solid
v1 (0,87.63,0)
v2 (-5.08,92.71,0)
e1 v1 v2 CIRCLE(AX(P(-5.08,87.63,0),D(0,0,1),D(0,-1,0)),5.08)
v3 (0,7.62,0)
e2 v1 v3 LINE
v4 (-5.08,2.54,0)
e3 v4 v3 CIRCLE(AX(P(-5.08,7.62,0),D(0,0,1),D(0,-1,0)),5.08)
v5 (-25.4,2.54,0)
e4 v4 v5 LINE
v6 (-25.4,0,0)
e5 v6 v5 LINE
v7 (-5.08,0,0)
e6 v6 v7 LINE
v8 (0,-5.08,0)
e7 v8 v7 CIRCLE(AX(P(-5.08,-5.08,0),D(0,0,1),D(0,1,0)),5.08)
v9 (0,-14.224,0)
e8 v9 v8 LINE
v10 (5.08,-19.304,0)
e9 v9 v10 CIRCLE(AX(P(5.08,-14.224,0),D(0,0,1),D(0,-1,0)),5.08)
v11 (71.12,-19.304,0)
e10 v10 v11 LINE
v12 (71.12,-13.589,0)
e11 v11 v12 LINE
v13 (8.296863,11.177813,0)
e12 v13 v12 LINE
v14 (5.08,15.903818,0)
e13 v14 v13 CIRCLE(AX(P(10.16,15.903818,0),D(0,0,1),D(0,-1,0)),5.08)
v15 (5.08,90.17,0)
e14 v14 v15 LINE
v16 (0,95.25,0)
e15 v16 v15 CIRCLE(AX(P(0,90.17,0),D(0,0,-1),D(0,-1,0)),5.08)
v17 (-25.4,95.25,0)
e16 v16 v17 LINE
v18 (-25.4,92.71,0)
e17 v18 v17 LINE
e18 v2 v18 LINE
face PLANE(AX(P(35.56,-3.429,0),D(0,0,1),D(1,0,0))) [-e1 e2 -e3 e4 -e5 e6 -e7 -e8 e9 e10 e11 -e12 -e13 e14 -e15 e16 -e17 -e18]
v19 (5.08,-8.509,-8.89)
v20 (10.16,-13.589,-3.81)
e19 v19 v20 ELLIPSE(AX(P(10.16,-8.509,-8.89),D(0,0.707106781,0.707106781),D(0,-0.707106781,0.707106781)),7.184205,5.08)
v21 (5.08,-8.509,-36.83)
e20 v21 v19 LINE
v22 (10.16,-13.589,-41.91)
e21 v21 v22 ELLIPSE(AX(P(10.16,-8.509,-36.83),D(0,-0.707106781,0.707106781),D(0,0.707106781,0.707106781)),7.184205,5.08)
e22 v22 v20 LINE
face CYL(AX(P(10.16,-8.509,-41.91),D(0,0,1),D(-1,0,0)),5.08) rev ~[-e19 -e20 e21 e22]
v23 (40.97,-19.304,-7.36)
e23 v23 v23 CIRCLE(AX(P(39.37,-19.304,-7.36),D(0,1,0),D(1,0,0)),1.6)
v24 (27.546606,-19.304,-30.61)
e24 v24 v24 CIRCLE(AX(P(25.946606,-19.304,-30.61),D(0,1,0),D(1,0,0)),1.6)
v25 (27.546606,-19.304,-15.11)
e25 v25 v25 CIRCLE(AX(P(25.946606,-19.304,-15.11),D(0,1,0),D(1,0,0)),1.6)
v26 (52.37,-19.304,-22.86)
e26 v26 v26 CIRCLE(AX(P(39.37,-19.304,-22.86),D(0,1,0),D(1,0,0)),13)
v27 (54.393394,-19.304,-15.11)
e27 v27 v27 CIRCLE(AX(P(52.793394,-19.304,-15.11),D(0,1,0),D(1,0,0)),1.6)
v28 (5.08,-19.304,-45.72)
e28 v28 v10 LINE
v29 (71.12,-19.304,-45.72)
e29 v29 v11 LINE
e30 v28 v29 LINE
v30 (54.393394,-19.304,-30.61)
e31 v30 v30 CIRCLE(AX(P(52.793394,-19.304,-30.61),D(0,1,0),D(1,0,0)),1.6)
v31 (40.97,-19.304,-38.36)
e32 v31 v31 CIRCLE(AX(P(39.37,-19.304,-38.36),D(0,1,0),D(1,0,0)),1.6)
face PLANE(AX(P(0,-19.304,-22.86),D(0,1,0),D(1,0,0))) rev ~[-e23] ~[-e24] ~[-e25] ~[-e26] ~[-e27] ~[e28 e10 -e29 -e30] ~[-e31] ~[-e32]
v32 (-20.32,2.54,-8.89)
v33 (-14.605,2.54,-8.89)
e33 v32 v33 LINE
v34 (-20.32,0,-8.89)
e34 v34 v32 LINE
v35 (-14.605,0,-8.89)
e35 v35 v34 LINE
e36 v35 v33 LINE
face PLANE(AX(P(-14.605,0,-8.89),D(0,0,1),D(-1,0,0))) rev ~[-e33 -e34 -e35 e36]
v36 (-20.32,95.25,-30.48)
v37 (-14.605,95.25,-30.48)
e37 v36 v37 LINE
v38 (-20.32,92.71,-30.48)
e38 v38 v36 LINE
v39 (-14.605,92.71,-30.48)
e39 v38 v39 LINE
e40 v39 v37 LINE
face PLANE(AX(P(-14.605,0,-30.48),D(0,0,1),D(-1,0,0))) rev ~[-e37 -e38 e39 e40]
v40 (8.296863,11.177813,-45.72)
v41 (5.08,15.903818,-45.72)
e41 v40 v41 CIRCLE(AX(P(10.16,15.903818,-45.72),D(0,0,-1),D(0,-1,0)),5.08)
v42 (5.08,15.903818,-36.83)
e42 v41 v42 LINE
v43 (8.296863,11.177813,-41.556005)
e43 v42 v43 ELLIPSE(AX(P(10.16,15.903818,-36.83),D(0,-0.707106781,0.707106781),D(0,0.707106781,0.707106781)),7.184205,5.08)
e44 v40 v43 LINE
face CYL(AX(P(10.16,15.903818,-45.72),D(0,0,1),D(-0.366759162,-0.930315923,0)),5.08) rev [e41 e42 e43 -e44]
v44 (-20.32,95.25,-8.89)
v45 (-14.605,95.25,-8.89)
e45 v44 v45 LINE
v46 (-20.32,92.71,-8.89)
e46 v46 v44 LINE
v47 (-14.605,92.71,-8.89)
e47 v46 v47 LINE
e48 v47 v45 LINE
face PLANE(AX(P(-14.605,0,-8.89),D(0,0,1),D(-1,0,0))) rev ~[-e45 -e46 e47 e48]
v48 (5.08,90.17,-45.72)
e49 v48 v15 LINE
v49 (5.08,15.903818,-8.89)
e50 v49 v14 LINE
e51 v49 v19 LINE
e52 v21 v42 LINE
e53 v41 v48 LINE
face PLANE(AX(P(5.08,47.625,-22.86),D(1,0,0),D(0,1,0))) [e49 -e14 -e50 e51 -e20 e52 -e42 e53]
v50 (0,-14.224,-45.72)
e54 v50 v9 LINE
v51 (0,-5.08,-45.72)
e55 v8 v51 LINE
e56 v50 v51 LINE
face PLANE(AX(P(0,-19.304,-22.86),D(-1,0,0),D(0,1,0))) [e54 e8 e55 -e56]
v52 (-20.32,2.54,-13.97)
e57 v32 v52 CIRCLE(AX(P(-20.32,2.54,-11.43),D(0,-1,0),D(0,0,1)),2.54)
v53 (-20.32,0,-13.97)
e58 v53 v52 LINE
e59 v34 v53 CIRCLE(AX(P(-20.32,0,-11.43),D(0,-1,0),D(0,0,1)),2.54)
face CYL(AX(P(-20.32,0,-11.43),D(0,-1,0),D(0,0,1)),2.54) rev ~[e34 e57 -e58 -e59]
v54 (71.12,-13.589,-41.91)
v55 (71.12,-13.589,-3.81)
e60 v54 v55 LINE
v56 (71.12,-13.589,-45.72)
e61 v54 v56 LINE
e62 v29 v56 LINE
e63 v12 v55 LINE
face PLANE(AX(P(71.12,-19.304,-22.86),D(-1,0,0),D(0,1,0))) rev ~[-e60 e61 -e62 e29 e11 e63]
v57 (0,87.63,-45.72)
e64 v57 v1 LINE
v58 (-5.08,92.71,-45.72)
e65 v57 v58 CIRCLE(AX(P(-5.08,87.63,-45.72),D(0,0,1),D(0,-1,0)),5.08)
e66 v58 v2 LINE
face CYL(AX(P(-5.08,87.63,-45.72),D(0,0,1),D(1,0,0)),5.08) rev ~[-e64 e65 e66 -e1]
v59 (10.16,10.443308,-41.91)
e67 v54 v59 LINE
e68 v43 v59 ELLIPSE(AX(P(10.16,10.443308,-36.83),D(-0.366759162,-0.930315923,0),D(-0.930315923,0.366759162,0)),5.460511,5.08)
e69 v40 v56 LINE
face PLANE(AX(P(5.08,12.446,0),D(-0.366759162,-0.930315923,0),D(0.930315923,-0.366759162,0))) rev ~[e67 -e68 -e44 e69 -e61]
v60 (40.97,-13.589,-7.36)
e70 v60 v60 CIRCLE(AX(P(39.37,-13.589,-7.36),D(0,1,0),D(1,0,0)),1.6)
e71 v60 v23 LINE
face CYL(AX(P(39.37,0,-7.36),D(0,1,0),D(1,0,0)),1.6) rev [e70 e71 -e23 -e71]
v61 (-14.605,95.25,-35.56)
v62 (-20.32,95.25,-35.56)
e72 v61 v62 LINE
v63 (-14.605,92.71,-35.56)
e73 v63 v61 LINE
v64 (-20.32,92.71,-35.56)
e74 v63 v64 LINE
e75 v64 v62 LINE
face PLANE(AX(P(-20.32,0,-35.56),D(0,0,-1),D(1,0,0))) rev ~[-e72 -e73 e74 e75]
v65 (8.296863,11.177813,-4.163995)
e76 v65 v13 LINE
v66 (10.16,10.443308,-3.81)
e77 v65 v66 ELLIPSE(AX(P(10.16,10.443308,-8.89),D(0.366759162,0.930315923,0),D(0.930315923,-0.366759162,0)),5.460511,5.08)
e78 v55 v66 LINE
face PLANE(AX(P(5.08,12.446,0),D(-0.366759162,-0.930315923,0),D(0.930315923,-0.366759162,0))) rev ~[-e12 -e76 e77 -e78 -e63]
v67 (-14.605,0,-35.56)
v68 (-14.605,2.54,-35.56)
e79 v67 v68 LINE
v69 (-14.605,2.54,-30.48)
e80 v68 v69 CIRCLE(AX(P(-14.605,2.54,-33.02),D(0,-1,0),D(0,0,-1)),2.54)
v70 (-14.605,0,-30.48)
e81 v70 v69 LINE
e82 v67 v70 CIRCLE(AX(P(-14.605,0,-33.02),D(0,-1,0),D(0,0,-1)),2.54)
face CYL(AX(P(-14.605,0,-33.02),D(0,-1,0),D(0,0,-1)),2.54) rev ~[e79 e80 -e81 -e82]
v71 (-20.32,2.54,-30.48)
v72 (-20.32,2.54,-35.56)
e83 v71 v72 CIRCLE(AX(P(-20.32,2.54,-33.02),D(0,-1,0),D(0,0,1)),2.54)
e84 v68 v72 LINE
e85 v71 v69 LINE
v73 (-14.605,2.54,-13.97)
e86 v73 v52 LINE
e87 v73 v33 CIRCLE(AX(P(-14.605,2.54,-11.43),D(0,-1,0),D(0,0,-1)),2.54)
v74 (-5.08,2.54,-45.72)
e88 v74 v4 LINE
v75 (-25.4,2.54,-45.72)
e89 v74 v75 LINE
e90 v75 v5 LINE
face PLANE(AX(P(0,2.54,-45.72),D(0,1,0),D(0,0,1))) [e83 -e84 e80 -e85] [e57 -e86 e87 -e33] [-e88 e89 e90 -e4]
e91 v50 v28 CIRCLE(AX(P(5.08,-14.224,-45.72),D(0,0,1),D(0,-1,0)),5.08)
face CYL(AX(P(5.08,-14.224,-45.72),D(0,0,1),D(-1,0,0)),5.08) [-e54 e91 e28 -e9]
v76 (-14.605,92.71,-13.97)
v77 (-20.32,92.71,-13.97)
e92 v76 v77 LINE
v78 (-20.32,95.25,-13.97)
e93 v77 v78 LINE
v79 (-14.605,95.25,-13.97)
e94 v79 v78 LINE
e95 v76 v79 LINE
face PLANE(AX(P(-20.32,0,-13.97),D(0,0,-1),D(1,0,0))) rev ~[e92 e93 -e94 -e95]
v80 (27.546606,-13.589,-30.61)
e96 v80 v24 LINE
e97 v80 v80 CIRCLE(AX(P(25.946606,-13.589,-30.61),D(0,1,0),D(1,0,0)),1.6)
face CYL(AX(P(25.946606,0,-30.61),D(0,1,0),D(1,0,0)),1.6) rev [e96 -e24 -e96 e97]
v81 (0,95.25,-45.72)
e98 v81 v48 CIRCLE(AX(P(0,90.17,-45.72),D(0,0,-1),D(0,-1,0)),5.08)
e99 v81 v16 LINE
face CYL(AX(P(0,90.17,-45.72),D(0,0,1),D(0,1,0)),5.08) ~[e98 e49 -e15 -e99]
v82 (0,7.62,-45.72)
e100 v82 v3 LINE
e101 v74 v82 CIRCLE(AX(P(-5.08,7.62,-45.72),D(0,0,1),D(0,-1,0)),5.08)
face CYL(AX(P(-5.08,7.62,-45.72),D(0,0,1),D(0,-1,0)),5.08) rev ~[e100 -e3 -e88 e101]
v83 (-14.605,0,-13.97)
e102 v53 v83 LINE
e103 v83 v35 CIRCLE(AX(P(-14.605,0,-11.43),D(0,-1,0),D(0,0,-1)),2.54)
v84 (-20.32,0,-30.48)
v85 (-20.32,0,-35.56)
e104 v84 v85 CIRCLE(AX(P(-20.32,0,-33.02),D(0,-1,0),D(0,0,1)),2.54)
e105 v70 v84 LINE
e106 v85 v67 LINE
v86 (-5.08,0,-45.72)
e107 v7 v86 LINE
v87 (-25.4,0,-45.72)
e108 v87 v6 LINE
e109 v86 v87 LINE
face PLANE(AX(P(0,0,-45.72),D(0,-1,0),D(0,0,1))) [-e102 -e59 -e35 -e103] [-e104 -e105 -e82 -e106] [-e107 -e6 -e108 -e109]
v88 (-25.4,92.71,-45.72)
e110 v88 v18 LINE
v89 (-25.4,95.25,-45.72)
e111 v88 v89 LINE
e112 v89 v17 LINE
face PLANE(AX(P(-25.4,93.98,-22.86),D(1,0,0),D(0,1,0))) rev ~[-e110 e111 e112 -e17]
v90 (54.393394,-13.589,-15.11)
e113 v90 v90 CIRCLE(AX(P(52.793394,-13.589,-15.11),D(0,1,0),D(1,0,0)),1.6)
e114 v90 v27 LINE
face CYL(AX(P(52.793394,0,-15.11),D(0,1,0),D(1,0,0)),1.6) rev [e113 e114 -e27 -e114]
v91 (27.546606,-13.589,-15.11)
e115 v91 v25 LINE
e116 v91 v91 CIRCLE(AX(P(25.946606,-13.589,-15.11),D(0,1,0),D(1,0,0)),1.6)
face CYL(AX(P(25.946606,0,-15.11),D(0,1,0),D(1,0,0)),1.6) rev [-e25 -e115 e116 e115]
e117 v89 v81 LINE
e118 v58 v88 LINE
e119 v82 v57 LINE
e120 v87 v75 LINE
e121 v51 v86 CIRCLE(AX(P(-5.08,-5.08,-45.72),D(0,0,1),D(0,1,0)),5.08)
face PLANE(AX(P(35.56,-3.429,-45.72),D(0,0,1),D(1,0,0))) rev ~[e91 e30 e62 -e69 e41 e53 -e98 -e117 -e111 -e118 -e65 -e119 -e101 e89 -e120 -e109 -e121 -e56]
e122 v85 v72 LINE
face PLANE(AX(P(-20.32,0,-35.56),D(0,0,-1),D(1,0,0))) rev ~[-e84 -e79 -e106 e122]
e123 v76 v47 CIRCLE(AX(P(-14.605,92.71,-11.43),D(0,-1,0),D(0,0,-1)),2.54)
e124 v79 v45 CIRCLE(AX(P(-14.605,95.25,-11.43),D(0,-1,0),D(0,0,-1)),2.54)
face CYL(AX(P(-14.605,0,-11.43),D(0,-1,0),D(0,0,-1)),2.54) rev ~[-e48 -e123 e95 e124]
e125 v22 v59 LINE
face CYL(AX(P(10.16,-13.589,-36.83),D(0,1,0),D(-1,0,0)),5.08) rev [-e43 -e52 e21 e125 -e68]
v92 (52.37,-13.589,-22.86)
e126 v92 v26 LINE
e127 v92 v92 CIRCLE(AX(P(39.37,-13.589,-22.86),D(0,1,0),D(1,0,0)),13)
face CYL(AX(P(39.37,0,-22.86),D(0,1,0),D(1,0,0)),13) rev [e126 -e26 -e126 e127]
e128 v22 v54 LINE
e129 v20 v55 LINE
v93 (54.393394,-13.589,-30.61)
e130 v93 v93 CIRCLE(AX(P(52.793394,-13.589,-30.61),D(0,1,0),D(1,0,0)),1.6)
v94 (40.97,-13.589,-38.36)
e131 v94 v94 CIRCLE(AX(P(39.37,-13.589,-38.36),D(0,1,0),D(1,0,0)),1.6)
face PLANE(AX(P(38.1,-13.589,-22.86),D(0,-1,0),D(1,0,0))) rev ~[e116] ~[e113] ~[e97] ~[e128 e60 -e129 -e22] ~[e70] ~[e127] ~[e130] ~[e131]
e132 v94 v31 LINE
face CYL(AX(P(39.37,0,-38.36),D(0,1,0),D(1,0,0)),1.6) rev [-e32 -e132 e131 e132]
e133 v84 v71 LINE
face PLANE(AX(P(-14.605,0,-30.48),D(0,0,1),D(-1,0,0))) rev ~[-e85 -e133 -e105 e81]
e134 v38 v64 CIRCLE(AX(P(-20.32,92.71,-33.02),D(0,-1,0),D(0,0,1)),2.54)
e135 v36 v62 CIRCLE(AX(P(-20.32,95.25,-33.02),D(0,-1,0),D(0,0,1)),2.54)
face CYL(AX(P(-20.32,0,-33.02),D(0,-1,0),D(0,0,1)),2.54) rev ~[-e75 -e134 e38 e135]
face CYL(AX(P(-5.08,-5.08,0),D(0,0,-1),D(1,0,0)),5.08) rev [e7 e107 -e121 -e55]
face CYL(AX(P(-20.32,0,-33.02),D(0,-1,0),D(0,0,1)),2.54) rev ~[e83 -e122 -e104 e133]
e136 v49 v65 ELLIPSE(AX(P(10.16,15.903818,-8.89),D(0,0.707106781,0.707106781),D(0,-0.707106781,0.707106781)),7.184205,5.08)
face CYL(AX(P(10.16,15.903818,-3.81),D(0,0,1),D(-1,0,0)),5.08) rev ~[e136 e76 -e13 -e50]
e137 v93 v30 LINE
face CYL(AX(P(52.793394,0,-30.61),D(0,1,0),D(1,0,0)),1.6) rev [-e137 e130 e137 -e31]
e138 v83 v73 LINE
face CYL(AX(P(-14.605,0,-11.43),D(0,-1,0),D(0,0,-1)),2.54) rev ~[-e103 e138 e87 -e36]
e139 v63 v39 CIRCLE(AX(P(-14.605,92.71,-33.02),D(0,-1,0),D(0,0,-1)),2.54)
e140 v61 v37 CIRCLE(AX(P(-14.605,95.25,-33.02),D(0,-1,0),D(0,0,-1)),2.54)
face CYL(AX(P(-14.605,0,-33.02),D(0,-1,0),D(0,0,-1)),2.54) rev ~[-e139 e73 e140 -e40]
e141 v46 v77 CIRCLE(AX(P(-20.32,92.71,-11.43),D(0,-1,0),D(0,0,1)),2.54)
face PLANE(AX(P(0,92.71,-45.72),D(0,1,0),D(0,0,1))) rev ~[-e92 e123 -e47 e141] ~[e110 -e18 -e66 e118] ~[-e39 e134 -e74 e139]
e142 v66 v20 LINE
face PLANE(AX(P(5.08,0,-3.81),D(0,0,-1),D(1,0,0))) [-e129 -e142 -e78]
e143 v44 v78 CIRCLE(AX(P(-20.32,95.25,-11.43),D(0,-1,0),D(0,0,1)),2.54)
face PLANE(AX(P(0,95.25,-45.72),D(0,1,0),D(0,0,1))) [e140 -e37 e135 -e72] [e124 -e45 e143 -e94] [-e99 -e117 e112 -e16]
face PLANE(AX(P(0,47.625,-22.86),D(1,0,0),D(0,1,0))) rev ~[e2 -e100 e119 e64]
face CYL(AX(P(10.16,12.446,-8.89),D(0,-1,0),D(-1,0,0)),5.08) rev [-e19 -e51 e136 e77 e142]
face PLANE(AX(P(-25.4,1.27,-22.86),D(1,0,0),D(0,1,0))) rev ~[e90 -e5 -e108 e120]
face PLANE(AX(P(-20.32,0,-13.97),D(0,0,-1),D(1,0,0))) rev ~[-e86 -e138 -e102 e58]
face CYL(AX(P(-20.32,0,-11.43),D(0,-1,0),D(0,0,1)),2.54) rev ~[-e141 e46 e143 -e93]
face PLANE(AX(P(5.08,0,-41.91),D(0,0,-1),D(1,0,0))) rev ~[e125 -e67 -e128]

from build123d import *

# Parameters (mm, degrees)
F0_W           = 95.25
F0_H           = 45.72
F1_DEPTH       = 5.08
F2_W           = 2.54
F2_H           = 45.72
F3_DEPTH       = 25.4
F5_DEPTH       = 95.251
F5_DEPTH_BACK  = 163
F8_W           = 71.12
F8_H           = 31.75
F9_DEPTH       = 22.86
F9_DEPTH_BACK  = 22.86
F10_W          = 66.04
F10_H          = 38.1
F11_DEPTH      = 95.251
F11_DEPTH_BACK = 13.589
F13_DEPTH      = 45.721
F13_DEPTH_BACK = 190
F14_R          = 1.6
F14_R_2        = 13
F15_DEPTH      = 19.305
F16_R          = 5.08


# Not quite as in the source:
# - an extrude ends at something that could not be found from the text; its depth is read off the source's solid


with BuildPart() as f1:
    # F0 (on Right) → F1 (new body)
    with BuildSketch(Plane.YZ):
        with Locations((47.625, -22.86)):
            Rectangle(F0_W, F0_H)
    extrude(amount=F1_DEPTH)

    # F2 (on Right) → F3 (join)
    with BuildSketch(Plane.YZ):
        with Locations((93.98, -22.86)):
            Rectangle(F2_W, F2_H)
        with Locations((1.27, -22.86)):
            Rectangle(F2_W, F2_H)
    extrude(amount=-F3_DEPTH)

    # F4 (on Front) → F5 (cut, two sides)
    with BuildSketch(Plane.XZ) as f5_sk:
        with BuildLine():
            Line((-20.32, -13.97), (-14.605, -13.97))
            ThreePointArc((-14.605, -13.97), (-12.065, -11.43), (-14.605, -8.89))
            Line((-14.605, -8.89), (-20.32, -8.89))
            ThreePointArc((-20.32, -8.89), (-22.86, -11.43), (-20.32, -13.97))
        make_face()
        with BuildLine():
            Line((-20.32, -35.56), (-14.605, -35.56))
            ThreePointArc((-14.605, -35.56), (-12.065, -33.02), (-14.605, -30.48))
            Line((-14.605, -30.48), (-20.32, -30.48))
            ThreePointArc((-20.32, -30.48), (-22.86, -33.02), (-20.32, -35.56))
        make_face()
    extrude(amount=-F5_DEPTH, mode=Mode.SUBTRACT)
    extrude(f5_sk.sketch, amount=F5_DEPTH_BACK, mode=Mode.SUBTRACT)

    # F8 (on plane+point) → F9 (join, two sides)
    with BuildSketch(Plane.XY.offset(-22.86)) as f9_sk:
        with Locations((35.56, -3.429)):
            Rectangle(F8_W, F8_H)
    extrude(amount=-F9_DEPTH)
    extrude(f9_sk.sketch, amount=F9_DEPTH_BACK)

    # F10 (on Front) → F11 (cut, two sides)
    with BuildSketch(Plane.XZ) as f11_sk:
        with Locations((38.1, -22.86)):
            Rectangle(F10_W, F10_H)
    extrude(amount=-F11_DEPTH, mode=Mode.SUBTRACT)
    extrude(f11_sk.sketch, amount=F11_DEPTH_BACK, mode=Mode.SUBTRACT)

    # F12 (on Top) → F13 (cut, two sides)
    with BuildSketch(Plane.XY) as f13_sk:
        Polygon((5.08, 12.446), (71.12, -13.589), (71.12, 12.446), align=None)
    extrude(amount=-F13_DEPTH, mode=Mode.SUBTRACT)
    extrude(f13_sk.sketch, amount=F13_DEPTH_BACK, mode=Mode.SUBTRACT)

    # F14 (on Front) → F15 (cut, through all)
    with BuildSketch(Plane.XZ):
        with Locations((39.37, -7.36)):
            Circle(F14_R)
        with Locations((25.9466062413, -15.11)):
            Circle(F14_R)
        with Locations((25.9466062413, -30.61)):
            Circle(F14_R)
        with Locations((39.37, -38.36)):
            Circle(F14_R)
        with Locations((52.7933937587, -30.61)):
            Circle(F14_R)
        with Locations((52.7933937587, -15.11)):
            Circle(F14_R)
        with Locations((39.37, -22.86)):
            Circle(F14_R_2)
    extrude(amount=F15_DEPTH, mode=Mode.SUBTRACT)

    # F16
    f16_edges = [f1.edges().sort_by_distance(p)[0] for p in [
        (0, 92.71, -22.86),
        (0, 2.54, -22.86),
        (0, 0, -22.86),
        (0, -19.304, -22.86),
        (5.08, -13.589, -22.86),
        (5.08, -0.5715, -3.81),
        (5.08, -0.5715, -41.91),
        (5.08, 12.446, -1.905),
        (5.08, 12.446, -43.815),
        (5.08, 95.25, -22.86),
    ]]
    fillet(f16_edges, radius=F16_R)


solid = f1.part
